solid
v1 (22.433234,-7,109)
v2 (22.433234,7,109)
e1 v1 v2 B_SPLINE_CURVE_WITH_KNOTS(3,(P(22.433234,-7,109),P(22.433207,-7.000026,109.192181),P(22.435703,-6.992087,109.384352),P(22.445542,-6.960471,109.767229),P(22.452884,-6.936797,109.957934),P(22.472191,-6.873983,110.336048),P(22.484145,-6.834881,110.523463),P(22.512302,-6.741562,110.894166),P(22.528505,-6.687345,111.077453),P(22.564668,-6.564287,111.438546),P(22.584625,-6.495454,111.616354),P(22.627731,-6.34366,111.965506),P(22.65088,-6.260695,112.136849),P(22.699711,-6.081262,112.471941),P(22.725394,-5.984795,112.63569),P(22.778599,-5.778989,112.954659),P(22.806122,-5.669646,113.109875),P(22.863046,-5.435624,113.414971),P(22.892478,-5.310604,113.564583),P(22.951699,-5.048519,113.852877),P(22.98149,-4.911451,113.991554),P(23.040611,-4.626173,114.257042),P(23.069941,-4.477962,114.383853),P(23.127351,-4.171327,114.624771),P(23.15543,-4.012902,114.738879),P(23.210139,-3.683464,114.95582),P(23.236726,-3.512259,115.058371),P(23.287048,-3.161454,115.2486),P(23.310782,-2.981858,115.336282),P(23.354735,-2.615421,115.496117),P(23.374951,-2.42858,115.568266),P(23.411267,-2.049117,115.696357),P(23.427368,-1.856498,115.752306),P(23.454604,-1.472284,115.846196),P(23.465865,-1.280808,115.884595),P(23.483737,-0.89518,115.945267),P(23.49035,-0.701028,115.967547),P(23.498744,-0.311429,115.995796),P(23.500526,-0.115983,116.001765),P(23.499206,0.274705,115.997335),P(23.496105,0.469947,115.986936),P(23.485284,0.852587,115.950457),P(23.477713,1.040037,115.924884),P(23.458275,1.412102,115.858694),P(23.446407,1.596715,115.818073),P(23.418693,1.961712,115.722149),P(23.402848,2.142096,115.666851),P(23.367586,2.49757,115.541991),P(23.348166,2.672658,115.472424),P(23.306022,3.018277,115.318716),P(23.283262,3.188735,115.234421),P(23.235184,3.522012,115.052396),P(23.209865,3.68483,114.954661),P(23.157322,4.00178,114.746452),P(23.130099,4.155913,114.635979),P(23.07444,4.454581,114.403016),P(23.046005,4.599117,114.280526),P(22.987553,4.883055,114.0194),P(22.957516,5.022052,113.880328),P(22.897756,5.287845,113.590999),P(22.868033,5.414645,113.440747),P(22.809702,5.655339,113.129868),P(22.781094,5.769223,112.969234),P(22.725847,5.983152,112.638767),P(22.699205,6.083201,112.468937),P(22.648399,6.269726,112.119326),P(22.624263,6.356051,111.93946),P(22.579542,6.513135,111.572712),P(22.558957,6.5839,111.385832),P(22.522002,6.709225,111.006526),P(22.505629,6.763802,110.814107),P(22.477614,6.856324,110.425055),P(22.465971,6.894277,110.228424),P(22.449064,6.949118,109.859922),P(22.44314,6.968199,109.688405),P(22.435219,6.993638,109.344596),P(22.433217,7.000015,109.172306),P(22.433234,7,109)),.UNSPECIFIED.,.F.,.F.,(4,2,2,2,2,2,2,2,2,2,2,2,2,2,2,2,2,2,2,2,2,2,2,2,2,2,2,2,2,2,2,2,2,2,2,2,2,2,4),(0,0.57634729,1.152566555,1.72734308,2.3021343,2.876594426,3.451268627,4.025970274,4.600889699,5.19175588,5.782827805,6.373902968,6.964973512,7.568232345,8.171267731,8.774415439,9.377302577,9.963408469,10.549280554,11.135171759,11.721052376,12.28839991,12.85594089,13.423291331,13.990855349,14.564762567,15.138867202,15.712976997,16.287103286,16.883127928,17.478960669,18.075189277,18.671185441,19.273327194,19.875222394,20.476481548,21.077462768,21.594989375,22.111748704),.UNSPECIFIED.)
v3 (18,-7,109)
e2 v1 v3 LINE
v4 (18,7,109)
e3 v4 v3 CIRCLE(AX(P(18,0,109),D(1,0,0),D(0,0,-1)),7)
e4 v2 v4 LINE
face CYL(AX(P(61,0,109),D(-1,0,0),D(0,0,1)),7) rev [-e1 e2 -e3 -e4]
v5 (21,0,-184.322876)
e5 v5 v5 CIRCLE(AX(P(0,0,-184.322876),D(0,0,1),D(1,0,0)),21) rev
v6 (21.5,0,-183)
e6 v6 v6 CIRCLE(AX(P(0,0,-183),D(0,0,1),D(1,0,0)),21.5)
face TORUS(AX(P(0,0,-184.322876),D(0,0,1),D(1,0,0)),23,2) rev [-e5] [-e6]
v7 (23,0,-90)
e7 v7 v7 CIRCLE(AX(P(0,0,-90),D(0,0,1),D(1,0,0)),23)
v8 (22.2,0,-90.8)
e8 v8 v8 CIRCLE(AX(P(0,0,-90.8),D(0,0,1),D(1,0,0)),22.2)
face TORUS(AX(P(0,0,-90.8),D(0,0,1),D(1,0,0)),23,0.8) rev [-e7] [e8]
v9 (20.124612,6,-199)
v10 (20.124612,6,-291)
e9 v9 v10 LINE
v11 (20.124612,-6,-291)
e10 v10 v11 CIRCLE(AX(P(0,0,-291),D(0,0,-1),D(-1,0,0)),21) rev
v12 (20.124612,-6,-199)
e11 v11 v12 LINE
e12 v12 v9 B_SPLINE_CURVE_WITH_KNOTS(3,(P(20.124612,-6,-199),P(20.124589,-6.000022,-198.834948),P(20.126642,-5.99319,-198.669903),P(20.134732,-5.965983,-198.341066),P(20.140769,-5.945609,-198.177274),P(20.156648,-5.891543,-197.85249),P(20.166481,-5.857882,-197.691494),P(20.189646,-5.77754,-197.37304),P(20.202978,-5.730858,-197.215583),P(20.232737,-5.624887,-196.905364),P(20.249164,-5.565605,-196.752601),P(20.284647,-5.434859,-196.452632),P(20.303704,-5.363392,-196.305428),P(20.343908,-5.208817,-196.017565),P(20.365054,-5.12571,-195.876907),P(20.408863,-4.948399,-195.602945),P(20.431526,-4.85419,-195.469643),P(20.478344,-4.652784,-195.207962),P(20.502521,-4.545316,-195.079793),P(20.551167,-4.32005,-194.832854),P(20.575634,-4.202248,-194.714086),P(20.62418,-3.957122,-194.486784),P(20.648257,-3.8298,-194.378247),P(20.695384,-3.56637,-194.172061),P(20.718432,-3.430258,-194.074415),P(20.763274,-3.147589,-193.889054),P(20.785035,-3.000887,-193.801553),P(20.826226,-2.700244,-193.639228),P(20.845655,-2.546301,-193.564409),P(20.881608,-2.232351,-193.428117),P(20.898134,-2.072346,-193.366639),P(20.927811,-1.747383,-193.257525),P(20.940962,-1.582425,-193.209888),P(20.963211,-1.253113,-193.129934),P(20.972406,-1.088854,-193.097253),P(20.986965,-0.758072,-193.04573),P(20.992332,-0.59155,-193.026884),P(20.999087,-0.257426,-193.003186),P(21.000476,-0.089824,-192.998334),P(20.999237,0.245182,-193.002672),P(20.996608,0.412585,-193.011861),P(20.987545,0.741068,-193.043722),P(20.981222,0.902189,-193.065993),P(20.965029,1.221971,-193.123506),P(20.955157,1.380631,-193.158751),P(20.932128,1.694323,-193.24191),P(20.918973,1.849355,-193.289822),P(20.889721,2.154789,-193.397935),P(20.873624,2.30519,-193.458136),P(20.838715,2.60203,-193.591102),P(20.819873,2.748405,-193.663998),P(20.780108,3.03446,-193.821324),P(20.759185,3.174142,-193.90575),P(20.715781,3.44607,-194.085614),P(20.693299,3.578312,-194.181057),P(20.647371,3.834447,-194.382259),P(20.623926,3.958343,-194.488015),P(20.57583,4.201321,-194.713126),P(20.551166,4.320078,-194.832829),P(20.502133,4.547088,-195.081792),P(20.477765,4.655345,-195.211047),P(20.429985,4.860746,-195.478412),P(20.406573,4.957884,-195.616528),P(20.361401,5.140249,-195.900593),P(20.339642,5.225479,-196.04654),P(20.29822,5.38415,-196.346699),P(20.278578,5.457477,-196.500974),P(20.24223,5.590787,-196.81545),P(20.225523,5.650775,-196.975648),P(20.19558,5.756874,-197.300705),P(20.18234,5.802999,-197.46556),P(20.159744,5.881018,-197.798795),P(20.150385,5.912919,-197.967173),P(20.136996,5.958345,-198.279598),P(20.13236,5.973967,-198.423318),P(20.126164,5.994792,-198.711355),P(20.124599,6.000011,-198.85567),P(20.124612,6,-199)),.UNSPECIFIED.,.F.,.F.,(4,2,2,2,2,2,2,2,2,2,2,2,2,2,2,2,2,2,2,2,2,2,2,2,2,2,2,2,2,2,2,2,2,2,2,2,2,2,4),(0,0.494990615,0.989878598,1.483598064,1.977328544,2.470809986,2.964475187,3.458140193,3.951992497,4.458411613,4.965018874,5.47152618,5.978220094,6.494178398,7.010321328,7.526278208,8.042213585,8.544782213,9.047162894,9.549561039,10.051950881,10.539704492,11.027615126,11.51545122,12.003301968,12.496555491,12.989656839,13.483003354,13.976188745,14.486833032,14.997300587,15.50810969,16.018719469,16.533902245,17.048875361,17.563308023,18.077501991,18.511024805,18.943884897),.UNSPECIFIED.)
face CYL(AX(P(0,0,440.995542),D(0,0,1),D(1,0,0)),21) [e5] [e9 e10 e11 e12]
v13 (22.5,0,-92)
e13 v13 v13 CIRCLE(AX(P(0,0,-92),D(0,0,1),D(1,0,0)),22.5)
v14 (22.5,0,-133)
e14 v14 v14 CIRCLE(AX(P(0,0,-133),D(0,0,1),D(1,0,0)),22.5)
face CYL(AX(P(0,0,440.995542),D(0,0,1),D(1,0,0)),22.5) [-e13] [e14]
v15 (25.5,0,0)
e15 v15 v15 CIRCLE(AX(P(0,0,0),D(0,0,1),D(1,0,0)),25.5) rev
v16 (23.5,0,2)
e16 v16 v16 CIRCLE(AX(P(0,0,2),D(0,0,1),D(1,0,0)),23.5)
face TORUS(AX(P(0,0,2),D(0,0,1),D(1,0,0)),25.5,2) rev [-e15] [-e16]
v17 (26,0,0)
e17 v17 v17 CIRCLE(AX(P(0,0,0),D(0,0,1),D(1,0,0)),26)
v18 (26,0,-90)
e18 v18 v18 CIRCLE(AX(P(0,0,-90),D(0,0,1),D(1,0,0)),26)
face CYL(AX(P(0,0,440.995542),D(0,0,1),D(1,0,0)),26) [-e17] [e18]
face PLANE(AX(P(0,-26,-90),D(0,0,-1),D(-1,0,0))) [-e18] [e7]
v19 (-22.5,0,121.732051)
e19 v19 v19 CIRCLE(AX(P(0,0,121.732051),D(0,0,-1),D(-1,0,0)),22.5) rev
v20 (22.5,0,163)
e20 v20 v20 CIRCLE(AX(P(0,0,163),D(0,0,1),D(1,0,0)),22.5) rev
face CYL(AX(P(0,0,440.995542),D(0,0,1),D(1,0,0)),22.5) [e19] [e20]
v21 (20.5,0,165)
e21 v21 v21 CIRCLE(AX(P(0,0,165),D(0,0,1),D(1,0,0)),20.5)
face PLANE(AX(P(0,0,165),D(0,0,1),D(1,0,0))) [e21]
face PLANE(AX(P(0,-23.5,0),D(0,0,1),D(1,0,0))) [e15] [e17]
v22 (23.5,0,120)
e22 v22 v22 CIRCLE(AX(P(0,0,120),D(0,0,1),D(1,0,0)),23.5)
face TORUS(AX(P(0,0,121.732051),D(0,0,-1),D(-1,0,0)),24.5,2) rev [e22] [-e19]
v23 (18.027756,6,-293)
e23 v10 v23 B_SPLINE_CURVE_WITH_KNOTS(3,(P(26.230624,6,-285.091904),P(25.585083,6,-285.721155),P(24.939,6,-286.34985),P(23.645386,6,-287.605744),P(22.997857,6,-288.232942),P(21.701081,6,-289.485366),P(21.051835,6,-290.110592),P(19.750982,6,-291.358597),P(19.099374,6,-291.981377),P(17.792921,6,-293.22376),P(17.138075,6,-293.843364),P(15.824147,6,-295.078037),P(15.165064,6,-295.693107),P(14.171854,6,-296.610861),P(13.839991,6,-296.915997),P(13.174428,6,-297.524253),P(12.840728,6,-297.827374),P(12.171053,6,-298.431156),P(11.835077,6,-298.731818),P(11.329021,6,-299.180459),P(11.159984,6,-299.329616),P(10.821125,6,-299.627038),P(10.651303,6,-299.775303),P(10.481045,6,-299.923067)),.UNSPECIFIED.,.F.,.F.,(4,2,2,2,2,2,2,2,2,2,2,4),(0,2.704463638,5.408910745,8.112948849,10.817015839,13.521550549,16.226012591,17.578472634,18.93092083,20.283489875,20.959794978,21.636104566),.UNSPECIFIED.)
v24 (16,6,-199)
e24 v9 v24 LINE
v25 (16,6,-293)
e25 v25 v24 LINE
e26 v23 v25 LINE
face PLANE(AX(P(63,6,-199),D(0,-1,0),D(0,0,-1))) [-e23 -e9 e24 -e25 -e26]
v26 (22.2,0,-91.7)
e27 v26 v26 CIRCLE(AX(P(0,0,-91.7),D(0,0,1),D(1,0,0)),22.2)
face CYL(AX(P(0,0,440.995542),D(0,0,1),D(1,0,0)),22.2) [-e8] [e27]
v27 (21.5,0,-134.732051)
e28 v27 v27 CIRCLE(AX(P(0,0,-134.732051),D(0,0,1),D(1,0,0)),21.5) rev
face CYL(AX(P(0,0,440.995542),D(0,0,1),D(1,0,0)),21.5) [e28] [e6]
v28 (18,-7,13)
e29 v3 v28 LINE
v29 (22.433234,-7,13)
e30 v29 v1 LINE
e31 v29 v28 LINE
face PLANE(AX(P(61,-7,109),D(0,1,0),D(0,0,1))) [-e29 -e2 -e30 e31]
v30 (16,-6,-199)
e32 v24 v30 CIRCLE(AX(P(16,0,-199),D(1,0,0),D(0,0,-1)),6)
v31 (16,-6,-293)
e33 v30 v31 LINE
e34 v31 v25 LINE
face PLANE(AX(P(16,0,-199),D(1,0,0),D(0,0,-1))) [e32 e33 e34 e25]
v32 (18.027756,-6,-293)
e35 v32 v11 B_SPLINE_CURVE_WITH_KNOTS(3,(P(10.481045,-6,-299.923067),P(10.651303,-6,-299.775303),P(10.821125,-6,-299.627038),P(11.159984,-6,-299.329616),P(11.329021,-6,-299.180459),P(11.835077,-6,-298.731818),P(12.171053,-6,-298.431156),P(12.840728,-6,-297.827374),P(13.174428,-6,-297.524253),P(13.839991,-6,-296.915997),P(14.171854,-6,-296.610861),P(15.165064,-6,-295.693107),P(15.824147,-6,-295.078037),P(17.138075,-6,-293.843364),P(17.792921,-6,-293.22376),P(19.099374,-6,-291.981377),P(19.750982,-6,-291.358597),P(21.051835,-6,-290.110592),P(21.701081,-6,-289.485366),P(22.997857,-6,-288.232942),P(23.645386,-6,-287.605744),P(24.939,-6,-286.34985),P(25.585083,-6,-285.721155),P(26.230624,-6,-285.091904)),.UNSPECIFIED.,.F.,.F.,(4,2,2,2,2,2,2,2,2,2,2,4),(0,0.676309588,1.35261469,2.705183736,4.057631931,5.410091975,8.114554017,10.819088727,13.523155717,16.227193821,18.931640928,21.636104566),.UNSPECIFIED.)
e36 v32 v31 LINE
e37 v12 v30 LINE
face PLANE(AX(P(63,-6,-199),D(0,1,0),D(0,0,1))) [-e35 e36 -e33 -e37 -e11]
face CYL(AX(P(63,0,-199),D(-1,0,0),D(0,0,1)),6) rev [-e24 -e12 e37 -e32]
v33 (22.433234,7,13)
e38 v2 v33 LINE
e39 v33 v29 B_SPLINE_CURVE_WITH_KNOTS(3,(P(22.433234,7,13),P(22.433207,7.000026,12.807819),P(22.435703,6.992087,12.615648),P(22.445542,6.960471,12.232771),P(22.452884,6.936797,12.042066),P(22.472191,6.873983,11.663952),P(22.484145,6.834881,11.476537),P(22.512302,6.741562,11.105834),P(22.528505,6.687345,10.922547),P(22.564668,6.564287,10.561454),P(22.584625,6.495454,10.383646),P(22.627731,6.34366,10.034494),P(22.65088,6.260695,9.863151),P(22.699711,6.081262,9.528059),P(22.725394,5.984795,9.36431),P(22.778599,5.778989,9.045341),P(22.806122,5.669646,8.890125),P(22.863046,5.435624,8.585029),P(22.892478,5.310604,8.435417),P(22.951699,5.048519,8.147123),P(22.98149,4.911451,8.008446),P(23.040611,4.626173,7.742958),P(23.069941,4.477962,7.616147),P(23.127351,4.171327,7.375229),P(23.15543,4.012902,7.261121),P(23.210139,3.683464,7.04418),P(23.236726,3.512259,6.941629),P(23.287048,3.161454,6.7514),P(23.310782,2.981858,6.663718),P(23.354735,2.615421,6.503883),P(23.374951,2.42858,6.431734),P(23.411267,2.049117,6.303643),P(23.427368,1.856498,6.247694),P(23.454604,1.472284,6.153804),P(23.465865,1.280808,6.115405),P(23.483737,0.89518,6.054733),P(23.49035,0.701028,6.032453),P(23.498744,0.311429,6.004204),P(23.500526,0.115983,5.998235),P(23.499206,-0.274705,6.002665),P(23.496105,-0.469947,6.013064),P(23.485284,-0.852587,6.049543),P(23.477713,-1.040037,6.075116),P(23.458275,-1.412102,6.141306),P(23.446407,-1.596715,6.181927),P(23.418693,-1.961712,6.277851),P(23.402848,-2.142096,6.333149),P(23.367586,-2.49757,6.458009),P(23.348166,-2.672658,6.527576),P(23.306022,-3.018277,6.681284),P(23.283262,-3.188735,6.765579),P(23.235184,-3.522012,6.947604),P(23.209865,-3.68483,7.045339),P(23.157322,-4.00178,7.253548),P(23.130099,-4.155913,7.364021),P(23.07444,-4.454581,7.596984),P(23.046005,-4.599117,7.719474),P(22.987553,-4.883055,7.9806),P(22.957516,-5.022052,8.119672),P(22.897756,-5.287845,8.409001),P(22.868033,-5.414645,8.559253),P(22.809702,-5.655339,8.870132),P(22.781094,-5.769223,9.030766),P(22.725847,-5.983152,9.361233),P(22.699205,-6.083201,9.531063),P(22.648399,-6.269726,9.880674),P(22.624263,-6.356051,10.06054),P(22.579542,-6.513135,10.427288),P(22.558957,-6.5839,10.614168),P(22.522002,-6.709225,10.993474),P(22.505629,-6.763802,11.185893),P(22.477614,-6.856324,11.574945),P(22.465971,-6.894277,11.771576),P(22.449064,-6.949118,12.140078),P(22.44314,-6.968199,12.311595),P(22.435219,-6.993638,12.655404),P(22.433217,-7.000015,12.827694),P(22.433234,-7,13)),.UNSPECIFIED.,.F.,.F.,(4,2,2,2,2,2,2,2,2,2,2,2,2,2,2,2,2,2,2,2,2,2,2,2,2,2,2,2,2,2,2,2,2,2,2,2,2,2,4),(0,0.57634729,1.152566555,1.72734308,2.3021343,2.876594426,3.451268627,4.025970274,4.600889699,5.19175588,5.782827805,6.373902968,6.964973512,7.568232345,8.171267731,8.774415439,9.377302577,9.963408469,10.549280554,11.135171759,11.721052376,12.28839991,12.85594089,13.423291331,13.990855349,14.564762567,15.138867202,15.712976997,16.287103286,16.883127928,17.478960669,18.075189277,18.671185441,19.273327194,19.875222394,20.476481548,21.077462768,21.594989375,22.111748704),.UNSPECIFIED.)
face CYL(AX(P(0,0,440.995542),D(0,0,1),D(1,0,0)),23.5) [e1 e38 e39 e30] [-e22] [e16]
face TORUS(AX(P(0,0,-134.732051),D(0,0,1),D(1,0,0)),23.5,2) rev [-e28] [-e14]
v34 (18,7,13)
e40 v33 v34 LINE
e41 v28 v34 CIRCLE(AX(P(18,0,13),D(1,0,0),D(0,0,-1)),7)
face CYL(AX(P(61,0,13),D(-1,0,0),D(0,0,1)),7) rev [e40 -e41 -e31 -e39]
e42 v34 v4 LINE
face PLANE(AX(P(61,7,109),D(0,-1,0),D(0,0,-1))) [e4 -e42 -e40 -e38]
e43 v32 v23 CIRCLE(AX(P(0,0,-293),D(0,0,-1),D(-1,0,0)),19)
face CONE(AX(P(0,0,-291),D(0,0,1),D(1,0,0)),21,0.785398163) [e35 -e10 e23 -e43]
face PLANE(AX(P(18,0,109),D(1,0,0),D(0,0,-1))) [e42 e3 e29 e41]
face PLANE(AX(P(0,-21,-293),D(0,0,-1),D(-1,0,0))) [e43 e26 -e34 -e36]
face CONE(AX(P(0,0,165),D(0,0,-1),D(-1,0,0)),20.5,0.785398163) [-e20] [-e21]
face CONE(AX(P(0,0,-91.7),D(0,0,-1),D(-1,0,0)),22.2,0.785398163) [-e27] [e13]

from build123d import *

# Parameters (mm, degrees)
FILLET_1_R          = 2
CHAMFER_1_SIZE      = 2
CUT_EXTRUDE_1_DEPTH = 43
CUT_EXTRUDE_2_DEPTH = 47


with BuildPart() as part:
    # 草图1 → 旋转1 (revolve)
    with BuildSketch(Plane(origin=(0, 0, 0), x_dir=(0, 0, -1), z_dir=(1, 0, 0)), mode=Mode.PRIVATE) as revolve_1_sk:
        with BuildLine():
            Line((-165, 0), (-165, -22.5))
            Line((-165, -22.5), (-120, -22.5))
            Line((-120, -22.5), (-120, -23.5))
            Line((-120, -23.5), (0, -23.5))
            Line((0, -23.5), (0, -26))
            Line((0, -26), (90, -26))
            Line((90, -26), (90, -23))
            ThreePointArc((90, -23), (90.234314575, -22.434314575), (90.8, -22.2))
            Line((90.8, -22.2), (91.7, -22.2))
            Line((91.7, -22.2), (92, -22.5))
            Line((92, -22.5), (133, -22.5))
            Line((133, -22.5), (133, -21.5))
            Line((133, -21.5), (183, -21.5))
            Line((183, -21.5), (183, -21))
            Line((183, -21), (293, -21))
            Line((293, -21), (293, 0))
            Line((293, 0), (-165, 0))
        make_face()
    revolve(revolve_1_sk.sketch.rotate(Axis((0, 0, 440.995541918), (0, 0, -1)), 270), axis=Axis((0, 0, 440.995541918), (0, 0, -1)))

    # 圆角1
    # the kernel refuses this fillet: 2 mm, written as the material it adds along each edge
    with BuildSketch(Plane(origin=(0, 0, 120), x_dir=(1, 0, 0), z_dir=(0, 1, 0))) as fillet_1_piece_1:
        with BuildLine():
            CenterArc((24.5, -1.732050808), FILLET_1_R, 120, 60)
            Line((23.5, 0), (23.48, 0.034641016))
            ThreePointArc((23.48, 0.034641016), (23, 0.04), (22.5, 0.04))
            Line((22.5, 0.04), (22.46, 0))
            Line((22.46, 0), (22.46, -1.732050808))
            Line((22.46, -1.732050808), (22.5, -1.732050808))
        make_face()
    revolve(axis=Axis((0, 0, 120), (0, 0, -1)))
    with BuildSketch(Plane(origin=(0, 0, 0), x_dir=(1, 0, 0), z_dir=(0, 1, 0))) as fillet_1_piece_2:
        with BuildLine():
            CenterArc((23.5 + FILLET_1_R, -FILLET_1_R), FILLET_1_R, 90, 90)
            Line((23.5 + FILLET_1_R, 0), (23.5 + FILLET_1_R, FILLET_1_R * 0.02))
            Line((23.5 + FILLET_1_R, FILLET_1_R * 0.02), (23.5 - FILLET_1_R * 0.02, FILLET_1_R * 0.02))
            Line((23.5 - FILLET_1_R * 0.02, FILLET_1_R * 0.02), (23.5 - FILLET_1_R * 0.02, -FILLET_1_R))
            Line((23.5 - FILLET_1_R * 0.02, -FILLET_1_R), (23.5, -FILLET_1_R))
        make_face()
    revolve(axis=Axis((0, 0, 0), (0, 0, -1)))
    with BuildSketch(Plane(origin=(0, 0, -133), x_dir=(1, 0, 0), z_dir=(0, 1, 0))) as fillet_1_piece_3:
        with BuildLine():
            CenterArc((23.5, 1.732050808), FILLET_1_R, 180, 60)
            Line((21.5, 1.732050808), (21.46, 1.732050808))
            Line((21.46, 1.732050808), (21.46, 0))
            Line((21.46, 0), (21.5, -0.04))
            ThreePointArc((21.5, -0.04), (22, -0.04), (22.48, -0.034641016))
            Line((22.48, -0.034641016), (22.5, 0))
        make_face()
    revolve(axis=Axis((0, 0, -133), (0, 0, -1)))
    with BuildSketch(Plane(origin=(0, 0, -183), x_dir=(1, 0, 0), z_dir=(0, 1, 0))) as fillet_1_piece_4:
        with BuildLine():
            CenterArc((23, 1.322875656), FILLET_1_R, 180, 41.409622109)
            Line((21, 1.322875656), (20.96, 1.322875656))
            Line((20.96, 1.322875656), (20.96, 0))
            Line((20.96, 0), (21, -0.04))
            ThreePointArc((21, -0.04), (21.25, -0.04), (21.47, -0.026457513))
            Line((21.47, -0.026457513), (21.5, 0))
        make_face()
    revolve(axis=Axis((0, 0, -183), (0, 0, -1)))

    # 倒角1
    chamfer_1_edges = [part.edges().sort_by_distance(p)[0] for p in [
        (-22.5, 0, 165),
        (-21, 0, -293),
    ]]
    chamfer(chamfer_1_edges, length=CHAMFER_1_SIZE)

    # 草图3 → 切除-拉伸1 (cut)
    with BuildSketch(Plane(origin=(18, 0, 0), x_dir=(0, 0, -1), z_dir=(1, 0, 0))):
        with BuildLine():
            Line((-109, 7), (-13, 7))
            ThreePointArc((-13, 7), (-6, 0), (-13, -7))
            Line((-13, -7), (-109, -7))
            ThreePointArc((-109, -7), (-116, 0), (-109, 7))
        make_face()
    extrude(amount=CUT_EXTRUDE_1_DEPTH, mode=Mode.SUBTRACT)

    # 草图4 → 切除-拉伸2 (cut)
    with BuildSketch(Plane(origin=(16, 0, 0), x_dir=(0, 0, -1), z_dir=(1, 0, 0))):
        with BuildLine():
            Line((199, 6), (293, 6))
            Line((293, 6), (293, -6))
            Line((293, -6), (199, -6))
            ThreePointArc((199, -6), (193, 0), (199, 6))
        make_face()
    extrude(amount=CUT_EXTRUDE_2_DEPTH, mode=Mode.SUBTRACT)


solid = part.part
